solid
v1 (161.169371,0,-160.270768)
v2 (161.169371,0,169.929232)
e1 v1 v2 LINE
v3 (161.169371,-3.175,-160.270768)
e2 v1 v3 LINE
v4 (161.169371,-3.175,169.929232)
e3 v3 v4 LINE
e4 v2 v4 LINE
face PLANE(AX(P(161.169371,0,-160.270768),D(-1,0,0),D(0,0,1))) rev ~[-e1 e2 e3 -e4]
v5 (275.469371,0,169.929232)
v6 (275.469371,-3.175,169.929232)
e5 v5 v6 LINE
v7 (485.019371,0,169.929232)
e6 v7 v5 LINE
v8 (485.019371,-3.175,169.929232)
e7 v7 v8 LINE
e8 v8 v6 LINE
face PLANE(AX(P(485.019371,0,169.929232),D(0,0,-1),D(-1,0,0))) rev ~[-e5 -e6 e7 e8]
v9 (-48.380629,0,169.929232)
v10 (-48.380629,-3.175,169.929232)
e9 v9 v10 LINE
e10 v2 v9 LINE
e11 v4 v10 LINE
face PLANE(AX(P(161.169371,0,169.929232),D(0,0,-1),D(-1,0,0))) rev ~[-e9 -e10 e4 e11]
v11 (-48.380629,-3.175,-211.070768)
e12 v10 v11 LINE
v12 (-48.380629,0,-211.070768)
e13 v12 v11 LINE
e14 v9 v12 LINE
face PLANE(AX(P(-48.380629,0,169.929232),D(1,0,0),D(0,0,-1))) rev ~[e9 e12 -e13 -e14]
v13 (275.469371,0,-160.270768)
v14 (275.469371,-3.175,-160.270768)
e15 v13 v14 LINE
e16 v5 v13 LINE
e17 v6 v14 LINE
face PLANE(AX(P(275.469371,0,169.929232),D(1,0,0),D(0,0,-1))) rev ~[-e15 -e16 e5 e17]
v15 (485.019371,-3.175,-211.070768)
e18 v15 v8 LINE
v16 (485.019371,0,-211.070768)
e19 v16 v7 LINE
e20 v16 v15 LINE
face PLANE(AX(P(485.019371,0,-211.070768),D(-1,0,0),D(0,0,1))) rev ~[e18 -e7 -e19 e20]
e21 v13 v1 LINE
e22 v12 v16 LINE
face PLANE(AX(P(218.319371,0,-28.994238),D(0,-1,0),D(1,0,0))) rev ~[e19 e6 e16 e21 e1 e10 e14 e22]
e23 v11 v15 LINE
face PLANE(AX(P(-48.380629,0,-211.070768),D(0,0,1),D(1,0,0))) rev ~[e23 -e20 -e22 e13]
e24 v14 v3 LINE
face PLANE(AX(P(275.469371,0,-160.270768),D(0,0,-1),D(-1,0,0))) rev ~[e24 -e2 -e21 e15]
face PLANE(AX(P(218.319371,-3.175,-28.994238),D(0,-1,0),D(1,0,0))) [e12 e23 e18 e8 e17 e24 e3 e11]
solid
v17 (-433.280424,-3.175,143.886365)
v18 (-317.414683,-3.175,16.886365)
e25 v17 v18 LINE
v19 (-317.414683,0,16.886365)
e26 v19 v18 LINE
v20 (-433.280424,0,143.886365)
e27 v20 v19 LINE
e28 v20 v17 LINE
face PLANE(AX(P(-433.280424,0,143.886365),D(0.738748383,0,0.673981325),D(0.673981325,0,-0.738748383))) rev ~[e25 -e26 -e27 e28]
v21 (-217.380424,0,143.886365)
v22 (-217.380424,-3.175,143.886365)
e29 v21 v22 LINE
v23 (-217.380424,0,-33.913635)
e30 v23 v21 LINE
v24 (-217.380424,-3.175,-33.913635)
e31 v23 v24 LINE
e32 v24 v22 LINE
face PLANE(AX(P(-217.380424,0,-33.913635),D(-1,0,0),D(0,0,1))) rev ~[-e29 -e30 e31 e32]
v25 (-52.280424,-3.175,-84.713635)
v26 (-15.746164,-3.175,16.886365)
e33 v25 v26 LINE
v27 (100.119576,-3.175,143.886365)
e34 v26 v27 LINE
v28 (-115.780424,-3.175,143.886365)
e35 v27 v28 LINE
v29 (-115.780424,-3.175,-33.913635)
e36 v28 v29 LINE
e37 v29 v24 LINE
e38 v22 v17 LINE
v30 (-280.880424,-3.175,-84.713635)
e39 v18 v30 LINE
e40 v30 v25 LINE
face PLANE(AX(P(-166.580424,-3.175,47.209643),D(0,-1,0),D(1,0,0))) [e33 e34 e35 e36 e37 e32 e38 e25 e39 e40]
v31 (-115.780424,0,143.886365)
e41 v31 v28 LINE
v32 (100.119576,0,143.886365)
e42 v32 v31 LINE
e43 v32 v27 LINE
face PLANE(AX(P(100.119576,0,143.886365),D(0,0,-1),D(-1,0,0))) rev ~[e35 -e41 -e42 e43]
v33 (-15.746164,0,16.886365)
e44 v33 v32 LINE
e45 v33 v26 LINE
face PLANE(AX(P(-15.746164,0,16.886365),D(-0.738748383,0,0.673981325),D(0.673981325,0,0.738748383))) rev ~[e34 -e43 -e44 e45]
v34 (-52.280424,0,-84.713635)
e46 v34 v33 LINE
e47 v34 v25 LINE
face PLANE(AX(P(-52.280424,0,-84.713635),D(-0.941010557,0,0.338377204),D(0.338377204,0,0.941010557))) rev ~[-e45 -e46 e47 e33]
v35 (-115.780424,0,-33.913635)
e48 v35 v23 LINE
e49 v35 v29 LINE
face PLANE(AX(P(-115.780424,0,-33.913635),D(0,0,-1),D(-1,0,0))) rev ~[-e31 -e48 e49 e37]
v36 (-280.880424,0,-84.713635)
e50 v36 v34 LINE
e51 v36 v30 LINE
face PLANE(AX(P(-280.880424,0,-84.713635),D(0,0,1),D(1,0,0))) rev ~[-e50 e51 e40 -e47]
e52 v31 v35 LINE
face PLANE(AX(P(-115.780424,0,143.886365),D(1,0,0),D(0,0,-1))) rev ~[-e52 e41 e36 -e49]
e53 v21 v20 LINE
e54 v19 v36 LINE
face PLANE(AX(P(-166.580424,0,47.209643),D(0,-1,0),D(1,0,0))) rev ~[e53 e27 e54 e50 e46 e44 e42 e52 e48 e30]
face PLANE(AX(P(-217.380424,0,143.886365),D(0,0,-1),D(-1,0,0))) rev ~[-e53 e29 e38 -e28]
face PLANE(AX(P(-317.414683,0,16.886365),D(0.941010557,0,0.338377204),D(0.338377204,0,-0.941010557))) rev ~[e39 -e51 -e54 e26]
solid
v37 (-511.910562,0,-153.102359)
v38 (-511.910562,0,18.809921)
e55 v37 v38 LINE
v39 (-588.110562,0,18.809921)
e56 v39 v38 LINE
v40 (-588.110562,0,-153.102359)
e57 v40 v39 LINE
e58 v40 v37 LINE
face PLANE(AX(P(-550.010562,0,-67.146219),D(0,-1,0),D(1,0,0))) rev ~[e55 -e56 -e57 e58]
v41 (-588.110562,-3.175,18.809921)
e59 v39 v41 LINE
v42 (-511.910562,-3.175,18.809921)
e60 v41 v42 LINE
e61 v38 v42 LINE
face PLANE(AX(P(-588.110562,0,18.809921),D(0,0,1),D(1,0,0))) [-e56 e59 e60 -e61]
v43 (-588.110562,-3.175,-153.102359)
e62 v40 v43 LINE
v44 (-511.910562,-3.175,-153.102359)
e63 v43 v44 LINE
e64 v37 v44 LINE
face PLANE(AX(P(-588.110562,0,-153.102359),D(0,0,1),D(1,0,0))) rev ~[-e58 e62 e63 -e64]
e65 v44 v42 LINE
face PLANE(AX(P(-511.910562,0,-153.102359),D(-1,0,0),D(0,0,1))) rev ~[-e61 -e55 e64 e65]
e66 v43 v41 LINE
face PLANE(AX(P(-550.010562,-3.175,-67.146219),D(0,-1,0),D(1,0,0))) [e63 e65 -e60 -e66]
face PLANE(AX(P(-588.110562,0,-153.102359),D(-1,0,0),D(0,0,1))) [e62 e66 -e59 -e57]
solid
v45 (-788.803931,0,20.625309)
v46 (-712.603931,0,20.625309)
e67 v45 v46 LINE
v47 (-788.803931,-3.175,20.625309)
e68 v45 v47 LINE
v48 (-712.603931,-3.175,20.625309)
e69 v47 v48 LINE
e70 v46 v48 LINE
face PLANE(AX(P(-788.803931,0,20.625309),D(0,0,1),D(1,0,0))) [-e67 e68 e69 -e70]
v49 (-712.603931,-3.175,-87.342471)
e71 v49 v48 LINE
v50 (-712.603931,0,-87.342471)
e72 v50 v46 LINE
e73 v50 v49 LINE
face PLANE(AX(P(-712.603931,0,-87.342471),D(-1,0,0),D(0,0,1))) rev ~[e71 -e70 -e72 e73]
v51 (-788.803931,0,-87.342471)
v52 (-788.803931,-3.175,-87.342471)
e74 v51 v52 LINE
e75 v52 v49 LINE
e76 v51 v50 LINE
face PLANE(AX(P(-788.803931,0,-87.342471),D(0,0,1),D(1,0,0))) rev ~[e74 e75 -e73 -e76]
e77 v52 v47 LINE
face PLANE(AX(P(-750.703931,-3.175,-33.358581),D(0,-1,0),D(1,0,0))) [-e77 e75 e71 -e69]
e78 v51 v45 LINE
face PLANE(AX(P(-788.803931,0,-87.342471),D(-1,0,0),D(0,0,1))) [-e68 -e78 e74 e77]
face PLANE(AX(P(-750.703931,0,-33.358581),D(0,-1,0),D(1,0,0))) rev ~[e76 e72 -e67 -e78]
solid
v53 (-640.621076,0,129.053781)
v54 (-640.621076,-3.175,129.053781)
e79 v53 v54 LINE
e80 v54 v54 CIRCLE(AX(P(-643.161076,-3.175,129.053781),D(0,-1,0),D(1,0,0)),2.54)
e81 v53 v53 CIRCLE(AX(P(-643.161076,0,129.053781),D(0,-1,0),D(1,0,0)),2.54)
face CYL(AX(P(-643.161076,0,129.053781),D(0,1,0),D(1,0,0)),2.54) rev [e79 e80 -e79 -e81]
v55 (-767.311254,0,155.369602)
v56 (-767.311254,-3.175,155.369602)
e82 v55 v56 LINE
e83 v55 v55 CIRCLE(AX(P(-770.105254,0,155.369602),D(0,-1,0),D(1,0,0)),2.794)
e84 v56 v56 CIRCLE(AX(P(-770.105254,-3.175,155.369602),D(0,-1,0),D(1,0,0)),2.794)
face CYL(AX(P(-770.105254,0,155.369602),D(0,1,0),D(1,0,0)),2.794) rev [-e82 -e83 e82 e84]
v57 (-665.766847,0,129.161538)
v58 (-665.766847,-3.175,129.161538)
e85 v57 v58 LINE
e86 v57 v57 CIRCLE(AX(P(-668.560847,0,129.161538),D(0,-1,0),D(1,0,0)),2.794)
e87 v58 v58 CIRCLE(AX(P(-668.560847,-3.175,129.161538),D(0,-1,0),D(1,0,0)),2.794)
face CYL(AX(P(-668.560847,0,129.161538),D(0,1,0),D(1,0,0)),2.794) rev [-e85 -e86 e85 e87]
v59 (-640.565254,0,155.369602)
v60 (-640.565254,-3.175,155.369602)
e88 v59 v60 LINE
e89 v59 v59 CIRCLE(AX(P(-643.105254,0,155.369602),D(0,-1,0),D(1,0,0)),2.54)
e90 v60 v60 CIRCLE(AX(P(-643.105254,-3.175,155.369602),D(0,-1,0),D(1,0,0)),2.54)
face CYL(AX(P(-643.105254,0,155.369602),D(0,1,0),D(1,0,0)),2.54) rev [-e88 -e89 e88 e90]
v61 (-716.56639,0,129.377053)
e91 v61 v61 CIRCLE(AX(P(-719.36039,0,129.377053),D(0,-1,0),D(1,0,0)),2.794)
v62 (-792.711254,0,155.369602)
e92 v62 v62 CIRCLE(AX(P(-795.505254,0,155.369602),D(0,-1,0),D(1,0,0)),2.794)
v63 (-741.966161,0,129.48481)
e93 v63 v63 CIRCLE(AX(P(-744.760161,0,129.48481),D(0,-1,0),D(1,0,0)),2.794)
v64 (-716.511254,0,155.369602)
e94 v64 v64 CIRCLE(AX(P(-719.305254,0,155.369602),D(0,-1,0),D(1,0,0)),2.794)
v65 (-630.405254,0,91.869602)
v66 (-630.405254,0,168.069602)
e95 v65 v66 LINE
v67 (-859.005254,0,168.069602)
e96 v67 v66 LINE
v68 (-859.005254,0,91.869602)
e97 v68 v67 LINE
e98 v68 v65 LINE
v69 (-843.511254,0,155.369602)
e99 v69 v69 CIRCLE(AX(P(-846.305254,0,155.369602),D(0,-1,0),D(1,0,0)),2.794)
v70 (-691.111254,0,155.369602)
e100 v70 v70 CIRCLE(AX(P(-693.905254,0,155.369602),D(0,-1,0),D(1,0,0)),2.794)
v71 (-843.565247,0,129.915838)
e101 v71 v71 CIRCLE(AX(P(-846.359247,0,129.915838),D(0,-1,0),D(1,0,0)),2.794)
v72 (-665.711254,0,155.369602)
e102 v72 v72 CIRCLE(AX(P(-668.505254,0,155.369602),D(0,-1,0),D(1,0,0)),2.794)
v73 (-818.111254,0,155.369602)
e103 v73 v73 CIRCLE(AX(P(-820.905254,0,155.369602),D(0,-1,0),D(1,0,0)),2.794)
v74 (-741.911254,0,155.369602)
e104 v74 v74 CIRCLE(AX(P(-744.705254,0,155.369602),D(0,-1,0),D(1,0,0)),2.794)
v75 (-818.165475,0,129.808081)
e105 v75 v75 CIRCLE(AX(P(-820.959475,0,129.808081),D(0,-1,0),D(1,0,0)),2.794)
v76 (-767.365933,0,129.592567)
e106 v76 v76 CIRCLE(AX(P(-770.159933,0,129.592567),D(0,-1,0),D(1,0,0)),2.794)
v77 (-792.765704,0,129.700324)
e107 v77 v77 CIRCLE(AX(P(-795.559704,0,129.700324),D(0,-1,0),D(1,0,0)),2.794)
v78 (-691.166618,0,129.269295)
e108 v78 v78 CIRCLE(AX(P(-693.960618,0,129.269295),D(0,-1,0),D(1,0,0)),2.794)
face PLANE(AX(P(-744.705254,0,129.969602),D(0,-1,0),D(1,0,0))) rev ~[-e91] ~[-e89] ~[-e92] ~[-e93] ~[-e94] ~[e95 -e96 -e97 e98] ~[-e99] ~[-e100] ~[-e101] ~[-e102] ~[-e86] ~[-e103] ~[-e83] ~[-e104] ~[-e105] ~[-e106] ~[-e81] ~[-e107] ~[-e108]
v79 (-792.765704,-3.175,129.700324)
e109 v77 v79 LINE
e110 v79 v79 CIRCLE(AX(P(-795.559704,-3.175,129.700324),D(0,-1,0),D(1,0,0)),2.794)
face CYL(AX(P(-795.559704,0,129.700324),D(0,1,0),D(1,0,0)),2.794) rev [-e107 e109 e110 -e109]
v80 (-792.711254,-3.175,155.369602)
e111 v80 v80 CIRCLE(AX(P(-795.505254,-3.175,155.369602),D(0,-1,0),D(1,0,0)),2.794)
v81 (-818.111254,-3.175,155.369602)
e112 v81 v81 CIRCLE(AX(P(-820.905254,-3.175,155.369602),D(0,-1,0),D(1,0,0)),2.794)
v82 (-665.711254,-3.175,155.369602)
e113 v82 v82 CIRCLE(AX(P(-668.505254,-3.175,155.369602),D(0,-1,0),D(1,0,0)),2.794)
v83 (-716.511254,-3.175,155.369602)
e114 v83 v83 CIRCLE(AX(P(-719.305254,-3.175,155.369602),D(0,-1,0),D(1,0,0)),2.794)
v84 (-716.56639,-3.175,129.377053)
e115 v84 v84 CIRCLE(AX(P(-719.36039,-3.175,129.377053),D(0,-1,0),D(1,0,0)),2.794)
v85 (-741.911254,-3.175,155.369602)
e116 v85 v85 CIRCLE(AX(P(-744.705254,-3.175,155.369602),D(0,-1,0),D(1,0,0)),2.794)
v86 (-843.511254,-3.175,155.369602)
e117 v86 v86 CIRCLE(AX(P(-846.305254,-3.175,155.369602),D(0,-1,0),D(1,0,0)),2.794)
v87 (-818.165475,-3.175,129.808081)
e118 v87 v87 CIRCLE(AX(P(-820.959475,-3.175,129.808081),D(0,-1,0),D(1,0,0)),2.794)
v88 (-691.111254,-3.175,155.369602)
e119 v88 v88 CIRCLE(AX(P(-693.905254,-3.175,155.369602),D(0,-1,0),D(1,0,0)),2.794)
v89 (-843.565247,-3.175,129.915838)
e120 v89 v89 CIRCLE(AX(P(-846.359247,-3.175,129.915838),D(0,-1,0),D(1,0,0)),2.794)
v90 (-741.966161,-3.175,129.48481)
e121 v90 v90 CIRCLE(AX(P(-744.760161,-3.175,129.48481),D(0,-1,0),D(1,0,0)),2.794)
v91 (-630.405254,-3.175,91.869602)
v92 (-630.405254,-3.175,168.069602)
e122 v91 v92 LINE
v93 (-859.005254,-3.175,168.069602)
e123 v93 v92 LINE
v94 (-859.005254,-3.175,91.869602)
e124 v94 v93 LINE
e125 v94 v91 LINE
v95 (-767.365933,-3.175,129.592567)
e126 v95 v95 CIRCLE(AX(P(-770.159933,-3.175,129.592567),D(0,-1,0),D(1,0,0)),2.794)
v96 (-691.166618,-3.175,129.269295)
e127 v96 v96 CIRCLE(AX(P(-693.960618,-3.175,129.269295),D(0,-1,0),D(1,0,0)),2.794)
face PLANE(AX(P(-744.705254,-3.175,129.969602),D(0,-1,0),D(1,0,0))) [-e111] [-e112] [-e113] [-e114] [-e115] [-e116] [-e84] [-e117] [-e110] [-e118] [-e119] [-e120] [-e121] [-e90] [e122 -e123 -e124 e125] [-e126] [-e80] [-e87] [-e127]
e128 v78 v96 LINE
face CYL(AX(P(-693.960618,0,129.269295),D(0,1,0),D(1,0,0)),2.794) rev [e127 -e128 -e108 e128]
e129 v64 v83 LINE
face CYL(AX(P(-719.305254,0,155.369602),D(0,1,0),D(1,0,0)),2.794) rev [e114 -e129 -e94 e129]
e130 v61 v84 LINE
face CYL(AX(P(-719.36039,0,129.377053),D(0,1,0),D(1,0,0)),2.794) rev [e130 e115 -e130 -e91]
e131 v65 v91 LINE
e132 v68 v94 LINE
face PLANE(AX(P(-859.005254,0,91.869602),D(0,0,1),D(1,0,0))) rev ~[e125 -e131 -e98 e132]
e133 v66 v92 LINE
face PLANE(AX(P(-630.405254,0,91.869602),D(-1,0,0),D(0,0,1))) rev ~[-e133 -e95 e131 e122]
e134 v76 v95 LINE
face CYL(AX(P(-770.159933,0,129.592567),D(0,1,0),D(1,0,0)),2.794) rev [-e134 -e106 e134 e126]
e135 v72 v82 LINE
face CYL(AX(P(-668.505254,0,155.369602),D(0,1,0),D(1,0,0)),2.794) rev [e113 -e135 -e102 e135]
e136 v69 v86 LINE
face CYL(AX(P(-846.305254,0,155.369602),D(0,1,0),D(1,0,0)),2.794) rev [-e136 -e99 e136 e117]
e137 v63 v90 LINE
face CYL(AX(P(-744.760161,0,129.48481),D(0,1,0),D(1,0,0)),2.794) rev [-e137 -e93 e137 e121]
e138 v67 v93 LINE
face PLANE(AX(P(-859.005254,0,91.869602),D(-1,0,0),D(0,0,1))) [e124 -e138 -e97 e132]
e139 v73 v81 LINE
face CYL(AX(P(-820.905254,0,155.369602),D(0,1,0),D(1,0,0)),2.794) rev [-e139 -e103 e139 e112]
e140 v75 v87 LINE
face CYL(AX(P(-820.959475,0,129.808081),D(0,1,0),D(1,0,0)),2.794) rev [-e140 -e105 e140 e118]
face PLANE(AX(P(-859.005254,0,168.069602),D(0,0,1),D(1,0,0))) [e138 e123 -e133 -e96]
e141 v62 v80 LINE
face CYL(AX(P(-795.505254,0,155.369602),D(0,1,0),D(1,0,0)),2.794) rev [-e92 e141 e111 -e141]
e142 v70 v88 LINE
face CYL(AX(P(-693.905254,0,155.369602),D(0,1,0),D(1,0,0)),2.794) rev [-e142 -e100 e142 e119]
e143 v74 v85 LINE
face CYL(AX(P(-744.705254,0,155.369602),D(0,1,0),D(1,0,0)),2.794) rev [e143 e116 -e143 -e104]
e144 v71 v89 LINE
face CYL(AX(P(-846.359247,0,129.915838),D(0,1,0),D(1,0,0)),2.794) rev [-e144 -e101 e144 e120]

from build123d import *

# Parameters (mm, degrees)
F1_DEPTH = 3.175
F4_W     = 76.2
F4_H     = 107.96778
F6_DEPTH = 3.175
F5_W     = 76.2
F5_H     = 171.91228
F7_DEPTH = 3.175
F3_W     = 228.6
F3_H     = 76.2
F3_R     = 2.794
F3_R_2   = 2.54
F8_DEPTH = 3.175
F9_DEPTH = 3.175


# Not quite as in the source:
# - a length typed as a fraction of an inch, garbled in the dataset ("3 / 203.2 mm" for 3/8 in), is restored


with BuildPart() as f1:
    # F0 (on Front) → F1 (new body)
    with BuildSketch(Plane.XZ):
        Polygon((-217.3804237127, 143.8863651395), (-433.2804237127, 143.8863651395), (-317.4146833124, 16.8863651395), (-280.8804237127, -84.7136348605), (-52.2804237127, -84.7136348605), (-15.7461641131, 16.8863651395), (100.1195762873, 143.8863651395), (-115.7804237127, 143.8863651395), (-115.7804237127, -33.9136348605), (-217.3804237127, -33.9136348605), align=None)
    extrude(amount=F1_DEPTH)


with BuildPart() as f6:
    # F4 (on Front) → F6 (new body)
    with BuildSketch(Plane.XZ):
        with Locations((-750.7039308548, -33.3585813642)):
            Rectangle(F4_W, F4_H)
    extrude(amount=F6_DEPTH)


with BuildPart() as f7:
    # F5 (on Front) → F7 (new body)
    with BuildSketch(Plane.XZ):
        with Locations((-550.0105619431, -67.1462193131)):
            Rectangle(F5_W, F5_H)
    extrude(amount=F7_DEPTH)


with BuildPart() as f8:
    # F3 (on Front) → F8 (new body)
    with BuildSketch(Plane.XZ):
        with Locations((-744.705254101, 129.9696020692)):
            Rectangle(F3_W, F3_H)
        with Locations((-846.3592469164, 129.9158378293)):
            Circle(F3_R, mode=Mode.SUBTRACT)
        with Locations((-820.9594754919, 129.808080774)):
            Circle(F3_R, mode=Mode.SUBTRACT)
        with Locations((-795.5597040674, 129.7003237186)):
            Circle(F3_R, mode=Mode.SUBTRACT)
        with Locations((-770.1599326429, 129.5925666632)):
            Circle(F3_R, mode=Mode.SUBTRACT)
        with Locations((-744.7601612184, 129.4848096079)):
            Circle(F3_R, mode=Mode.SUBTRACT)
        with Locations((-719.3603897939, 129.3770525525)):
            Circle(F3_R, mode=Mode.SUBTRACT)
        with Locations((-693.9606183694, 129.2692954972)):
            Circle(F3_R, mode=Mode.SUBTRACT)
        with Locations((-668.5608469449, 129.1615384418)):
            Circle(F3_R, mode=Mode.SUBTRACT)
        with Locations((-643.1610755204, 129.0537813865)):
            Circle(F3_R_2, mode=Mode.SUBTRACT)
        with Locations((-846.305254101, 155.3696020692)):
            Circle(F3_R, mode=Mode.SUBTRACT)
        with Locations((-820.905254101, 155.3696020692)):
            Circle(F3_R, mode=Mode.SUBTRACT)
        with Locations((-795.505254101, 155.3696020692)):
            Circle(F3_R, mode=Mode.SUBTRACT)
        with Locations((-770.105254101, 155.3696020692)):
            Circle(F3_R, mode=Mode.SUBTRACT)
        with Locations((-744.705254101, 155.3696020692)):
            Circle(F3_R, mode=Mode.SUBTRACT)
        with Locations((-719.305254101, 155.3696020692)):
            Circle(F3_R, mode=Mode.SUBTRACT)
        with Locations((-693.905254101, 155.3696020692)):
            Circle(F3_R, mode=Mode.SUBTRACT)
        with Locations((-668.505254101, 155.3696020692)):
            Circle(F3_R, mode=Mode.SUBTRACT)
        with Locations((-643.105254101, 155.3696020692)):
            Circle(F3_R_2, mode=Mode.SUBTRACT)
    extrude(amount=F8_DEPTH)


with BuildPart() as f9:
    # F2 (on Front) → F9 (new body)
    with BuildSketch(Plane.XZ):
        Polygon((161.1693713427, 169.9292318031), (-48.3806286573, 169.9292318031), (-48.3806286573, -211.0707681969), (485.0193713427, -211.0707681969), (485.0193713427, 169.9292318031), (275.4693713427, 169.9292318031), (275.4693713427, -160.2707681969), (161.1693713427, -160.2707681969), align=None)
    extrude(amount=F9_DEPTH)


solid = Compound([f1.part, f6.part, f7.part, f8.part, f9.part])
